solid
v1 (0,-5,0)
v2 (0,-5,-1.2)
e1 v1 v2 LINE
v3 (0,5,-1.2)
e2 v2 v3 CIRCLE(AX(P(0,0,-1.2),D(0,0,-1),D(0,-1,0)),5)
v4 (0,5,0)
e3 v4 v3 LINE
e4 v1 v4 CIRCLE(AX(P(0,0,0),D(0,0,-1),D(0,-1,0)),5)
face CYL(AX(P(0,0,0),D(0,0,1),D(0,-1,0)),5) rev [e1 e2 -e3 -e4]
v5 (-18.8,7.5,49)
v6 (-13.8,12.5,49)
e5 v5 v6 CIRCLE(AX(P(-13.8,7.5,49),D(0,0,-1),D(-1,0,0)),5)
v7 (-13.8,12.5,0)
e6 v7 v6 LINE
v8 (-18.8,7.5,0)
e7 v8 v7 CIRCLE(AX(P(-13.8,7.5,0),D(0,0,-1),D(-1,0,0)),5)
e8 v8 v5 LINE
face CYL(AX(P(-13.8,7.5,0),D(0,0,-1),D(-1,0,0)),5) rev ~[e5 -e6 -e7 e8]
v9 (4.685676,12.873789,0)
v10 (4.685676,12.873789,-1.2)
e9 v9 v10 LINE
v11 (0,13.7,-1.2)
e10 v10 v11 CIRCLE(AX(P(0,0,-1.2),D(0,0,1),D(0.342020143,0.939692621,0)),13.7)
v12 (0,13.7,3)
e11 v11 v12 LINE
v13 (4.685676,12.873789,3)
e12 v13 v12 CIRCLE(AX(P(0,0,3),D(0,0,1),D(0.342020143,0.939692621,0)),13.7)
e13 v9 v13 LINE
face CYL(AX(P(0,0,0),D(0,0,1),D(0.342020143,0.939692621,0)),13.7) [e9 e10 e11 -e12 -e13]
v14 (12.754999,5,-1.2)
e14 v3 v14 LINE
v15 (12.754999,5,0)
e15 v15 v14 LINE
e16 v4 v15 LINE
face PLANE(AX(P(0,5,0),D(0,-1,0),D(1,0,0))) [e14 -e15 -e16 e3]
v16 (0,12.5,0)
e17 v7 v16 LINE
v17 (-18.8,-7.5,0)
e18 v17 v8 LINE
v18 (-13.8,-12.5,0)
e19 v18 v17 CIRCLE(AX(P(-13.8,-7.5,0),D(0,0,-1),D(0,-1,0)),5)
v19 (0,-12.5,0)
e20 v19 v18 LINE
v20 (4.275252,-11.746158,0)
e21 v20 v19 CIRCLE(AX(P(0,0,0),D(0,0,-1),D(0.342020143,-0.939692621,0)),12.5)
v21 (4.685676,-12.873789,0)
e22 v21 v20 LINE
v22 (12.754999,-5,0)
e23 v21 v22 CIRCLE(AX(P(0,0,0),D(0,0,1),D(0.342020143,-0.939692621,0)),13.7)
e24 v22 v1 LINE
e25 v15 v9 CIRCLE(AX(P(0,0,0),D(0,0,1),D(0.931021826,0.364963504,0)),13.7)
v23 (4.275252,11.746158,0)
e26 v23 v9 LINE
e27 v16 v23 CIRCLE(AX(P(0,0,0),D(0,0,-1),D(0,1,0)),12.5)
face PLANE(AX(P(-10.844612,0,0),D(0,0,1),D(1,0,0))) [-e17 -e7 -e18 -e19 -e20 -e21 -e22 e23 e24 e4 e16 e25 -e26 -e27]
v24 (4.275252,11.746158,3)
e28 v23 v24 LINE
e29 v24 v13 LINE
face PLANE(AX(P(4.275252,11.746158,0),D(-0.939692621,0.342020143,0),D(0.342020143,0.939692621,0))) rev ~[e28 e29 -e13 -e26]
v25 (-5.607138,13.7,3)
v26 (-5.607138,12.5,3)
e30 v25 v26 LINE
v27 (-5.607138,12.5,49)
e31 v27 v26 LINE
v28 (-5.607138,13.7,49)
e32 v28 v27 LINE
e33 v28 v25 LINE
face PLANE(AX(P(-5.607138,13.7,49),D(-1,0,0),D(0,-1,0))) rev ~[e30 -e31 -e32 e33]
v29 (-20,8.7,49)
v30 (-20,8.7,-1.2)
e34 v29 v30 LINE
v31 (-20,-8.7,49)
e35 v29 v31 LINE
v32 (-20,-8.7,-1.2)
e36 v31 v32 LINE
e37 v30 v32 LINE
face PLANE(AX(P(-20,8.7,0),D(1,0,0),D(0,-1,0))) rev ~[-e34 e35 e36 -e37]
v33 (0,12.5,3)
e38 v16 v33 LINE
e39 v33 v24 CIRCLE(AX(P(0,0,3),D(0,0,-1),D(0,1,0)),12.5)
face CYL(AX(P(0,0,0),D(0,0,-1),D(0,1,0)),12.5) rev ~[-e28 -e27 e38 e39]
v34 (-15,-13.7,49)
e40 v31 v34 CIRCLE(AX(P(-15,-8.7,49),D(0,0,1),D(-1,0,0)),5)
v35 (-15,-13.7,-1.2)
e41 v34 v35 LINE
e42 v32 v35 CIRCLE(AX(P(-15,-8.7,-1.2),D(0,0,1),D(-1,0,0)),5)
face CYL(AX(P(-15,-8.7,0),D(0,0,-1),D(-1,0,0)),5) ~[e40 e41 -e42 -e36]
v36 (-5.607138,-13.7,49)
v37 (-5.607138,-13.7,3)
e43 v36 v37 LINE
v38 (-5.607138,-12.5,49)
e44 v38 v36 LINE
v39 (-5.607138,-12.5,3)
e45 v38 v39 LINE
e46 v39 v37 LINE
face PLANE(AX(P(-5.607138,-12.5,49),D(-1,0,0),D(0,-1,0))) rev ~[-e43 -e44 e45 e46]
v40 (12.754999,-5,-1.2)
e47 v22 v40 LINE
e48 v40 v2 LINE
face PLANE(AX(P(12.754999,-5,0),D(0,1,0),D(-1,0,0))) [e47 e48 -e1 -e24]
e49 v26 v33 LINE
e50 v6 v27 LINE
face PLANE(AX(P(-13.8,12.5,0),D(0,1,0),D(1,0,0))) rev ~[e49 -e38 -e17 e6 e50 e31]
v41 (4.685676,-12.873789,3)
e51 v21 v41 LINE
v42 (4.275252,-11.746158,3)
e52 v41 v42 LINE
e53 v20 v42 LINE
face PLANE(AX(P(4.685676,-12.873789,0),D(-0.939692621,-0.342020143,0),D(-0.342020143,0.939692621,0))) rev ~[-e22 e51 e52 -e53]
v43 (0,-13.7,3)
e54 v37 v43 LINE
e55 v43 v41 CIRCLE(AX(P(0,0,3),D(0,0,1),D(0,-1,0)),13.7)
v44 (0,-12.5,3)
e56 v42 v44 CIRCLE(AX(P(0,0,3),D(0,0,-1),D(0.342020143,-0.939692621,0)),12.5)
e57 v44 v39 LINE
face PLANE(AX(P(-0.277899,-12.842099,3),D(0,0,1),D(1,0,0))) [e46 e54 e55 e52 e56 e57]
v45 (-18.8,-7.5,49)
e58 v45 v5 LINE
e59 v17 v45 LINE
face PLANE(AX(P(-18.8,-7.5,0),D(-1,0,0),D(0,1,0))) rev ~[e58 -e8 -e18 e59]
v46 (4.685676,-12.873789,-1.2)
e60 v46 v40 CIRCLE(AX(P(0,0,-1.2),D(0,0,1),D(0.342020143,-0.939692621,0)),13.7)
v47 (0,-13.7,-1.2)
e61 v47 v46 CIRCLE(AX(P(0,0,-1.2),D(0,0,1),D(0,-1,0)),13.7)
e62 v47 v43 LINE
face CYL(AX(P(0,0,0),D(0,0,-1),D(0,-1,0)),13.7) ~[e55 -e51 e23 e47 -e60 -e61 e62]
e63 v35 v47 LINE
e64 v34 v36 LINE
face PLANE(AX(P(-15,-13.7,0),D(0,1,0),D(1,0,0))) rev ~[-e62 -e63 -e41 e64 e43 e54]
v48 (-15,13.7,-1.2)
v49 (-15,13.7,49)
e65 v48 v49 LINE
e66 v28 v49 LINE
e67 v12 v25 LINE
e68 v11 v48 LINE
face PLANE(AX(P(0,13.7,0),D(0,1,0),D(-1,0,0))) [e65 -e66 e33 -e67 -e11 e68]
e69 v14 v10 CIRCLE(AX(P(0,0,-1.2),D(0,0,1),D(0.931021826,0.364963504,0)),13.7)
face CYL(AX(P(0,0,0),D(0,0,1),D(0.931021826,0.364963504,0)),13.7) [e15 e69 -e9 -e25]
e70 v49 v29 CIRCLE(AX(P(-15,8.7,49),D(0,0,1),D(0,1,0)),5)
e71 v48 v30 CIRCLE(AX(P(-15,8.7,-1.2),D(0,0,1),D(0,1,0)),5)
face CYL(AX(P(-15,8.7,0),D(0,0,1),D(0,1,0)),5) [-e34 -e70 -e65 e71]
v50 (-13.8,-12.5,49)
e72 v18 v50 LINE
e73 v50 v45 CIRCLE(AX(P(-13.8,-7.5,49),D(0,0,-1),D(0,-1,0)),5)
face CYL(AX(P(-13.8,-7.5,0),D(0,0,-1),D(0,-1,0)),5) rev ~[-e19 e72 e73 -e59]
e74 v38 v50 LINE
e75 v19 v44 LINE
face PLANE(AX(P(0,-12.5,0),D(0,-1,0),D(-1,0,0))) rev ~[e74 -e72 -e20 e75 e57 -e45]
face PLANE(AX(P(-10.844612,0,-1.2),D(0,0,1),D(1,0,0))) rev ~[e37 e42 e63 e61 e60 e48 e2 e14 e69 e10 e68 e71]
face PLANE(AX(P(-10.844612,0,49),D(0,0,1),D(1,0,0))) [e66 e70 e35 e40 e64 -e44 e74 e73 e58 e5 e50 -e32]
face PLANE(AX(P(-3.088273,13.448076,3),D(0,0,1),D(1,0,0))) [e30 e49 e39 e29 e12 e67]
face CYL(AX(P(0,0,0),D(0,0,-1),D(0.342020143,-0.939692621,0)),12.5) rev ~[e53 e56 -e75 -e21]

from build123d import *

# Parameters (mm, degrees)
F1_DEPTH = 1.2
F2_DEPTH = 49
F4_DEPTH = 46


# Not quite as in the source:
# - a feature names something its author has since deleted; it is built from what else it names


with BuildPart() as f1:
    # F0 (on Top) → F1 (new body)
    with BuildSketch(Plane.XY):
        with BuildLine():
            Line((-15, -13.7), (0, -13.7))
            ThreePointArc((0, -13.7), (2.378980034, -13.4918662163), (4.6856759636, -12.8737889048))
            Line((4.6856759636, -12.8737889048), (4.2752517916, -11.7461577598))
            ThreePointArc((4.2752517916, -11.7461577598), (2.1706022208, -12.3100969127), (0, -12.5))
            Line((0, -12.5), (-13.8, -12.5))
            ThreePointArc((-13.8, -12.5), (-17.3355339059, -11.0355339059), (-18.8, -7.5))
            Line((-18.8, -7.5), (-18.8, 7.5))
            ThreePointArc((-18.8, 7.5), (-17.3355339059, 11.0355339059), (-13.8, 12.5))
            Line((-13.8, 12.5), (0, 12.5))
            ThreePointArc((0, 12.5), (2.1706022208, 12.3100969127), (4.2752517916, 11.7461577598))
            Line((4.2752517916, 11.7461577598), (4.6856759636, 12.8737889048))
            ThreePointArc((4.6856759636, 12.8737889048), (2.378980034, 13.4918662163), (0, 13.7))
            Line((0, 13.7), (-15, 13.7))
            ThreePointArc((-15, 13.7), (-18.5355339059, 12.2355339059), (-20, 8.7))
            Line((-20, 8.7), (-20, -8.7))
            ThreePointArc((-20, -8.7), (-18.5355339059, -12.2355339059), (-15, -13.7))
        make_face()
        with BuildLine():
            Line((4.2752517916, -11.7461577598), (4.6856759636, -12.8737889048))
            ThreePointArc((4.6856759636, -12.8737889048), (9.5678327692, -9.8054360485), (12.75499902, -5))
            Line((12.75499902, -5), (11.4564392374, -5))
            ThreePointArc((11.4564392374, -5), (8.5585738758, -9.1104782099), (4.2752517916, -11.7461577598))
        make_face()
        with BuildLine():
            ThreePointArc((0, -12.5), (2.1706022208, -12.3100969127), (4.2752517916, -11.7461577598))
            ThreePointArc((4.2752517916, -11.7461577598), (8.5585738758, -9.1104782099), (11.4564392374, -5))
            Line((11.4564392374, -5), (0, -5))
            ThreePointArc((0, -5), (-5, 0), (0, 5))
            Line((0, 5), (11.4564392374, 5))
            ThreePointArc((11.4564392374, 5), (8.5585738758, 9.1104782099), (4.2752517916, 11.7461577598))
            ThreePointArc((4.2752517916, 11.7461577598), (2.1706022208, 12.3100969127), (0, 12.5))
            Line((0, 12.5), (-13.8, 12.5))
            ThreePointArc((-13.8, 12.5), (-17.3355339059, 11.0355339059), (-18.8, 7.5))
            Line((-18.8, 7.5), (-18.8, -7.5))
            ThreePointArc((-18.8, -7.5), (-17.3355339059, -11.0355339059), (-13.8, -12.5))
            Line((-13.8, -12.5), (0, -12.5))
        make_face()
        with BuildLine():
            ThreePointArc((4.2752517916, 11.7461577598), (8.5585738758, 9.1104782099), (11.4564392374, 5))
            Line((11.4564392374, 5), (12.75499902, 5))
            ThreePointArc((12.75499902, 5), (9.5678327692, 9.8054360485), (4.6856759636, 12.8737889048))
            Line((4.6856759636, 12.8737889048), (4.2752517916, 11.7461577598))
        make_face()
    extrude(amount=-F1_DEPTH)

    # F0 (on Top) → F2 (join)
    with BuildSketch(Plane.XY):
        with BuildLine():
            Line((-15, -13.7), (0, -13.7))
            ThreePointArc((0, -13.7), (2.378980034, -13.4918662163), (4.6856759636, -12.8737889048))
            Line((4.6856759636, -12.8737889048), (4.2752517916, -11.7461577598))
            ThreePointArc((4.2752517916, -11.7461577598), (2.1706022208, -12.3100969127), (0, -12.5))
            Line((0, -12.5), (-13.8, -12.5))
            ThreePointArc((-13.8, -12.5), (-17.3355339059, -11.0355339059), (-18.8, -7.5))
            Line((-18.8, -7.5), (-18.8, 7.5))
            ThreePointArc((-18.8, 7.5), (-17.3355339059, 11.0355339059), (-13.8, 12.5))
            Line((-13.8, 12.5), (0, 12.5))
            ThreePointArc((0, 12.5), (2.1706022208, 12.3100969127), (4.2752517916, 11.7461577598))
            Line((4.2752517916, 11.7461577598), (4.6856759636, 12.8737889048))
            ThreePointArc((4.6856759636, 12.8737889048), (2.378980034, 13.4918662163), (0, 13.7))
            Line((0, 13.7), (-15, 13.7))
            ThreePointArc((-15, 13.7), (-18.5355339059, 12.2355339059), (-20, 8.7))
            Line((-20, 8.7), (-20, -8.7))
            ThreePointArc((-20, -8.7), (-18.5355339059, -12.2355339059), (-15, -13.7))
        make_face()
    extrude(amount=F2_DEPTH)

    # F3 (on face) → F4 (cut)
    with BuildSketch(Plane.XY.offset(49)):
        with BuildLine():
            ThreePointArc((-5.6071383076, 12.5), (-2.8670542374, 13.3966413701), (0, 13.7))
            Line((0, 13.7), (-5.6071383076, 13.7))
            Line((-5.6071383076, 13.7), (-5.6071383076, 12.5))
        make_face()
        with BuildLine():
            Line((4.2752517916, 11.7461577598), (4.6856759636, 12.8737889048))
            ThreePointArc((4.6856759636, 12.8737889048), (2.378980034, 13.4918662163), (0, 13.7))
            ThreePointArc((0, 13.7), (-2.8670542374, 13.3966413701), (-5.6071383076, 12.5))
            Line((-5.6071383076, 12.5), (0, 12.5))
            ThreePointArc((0, 12.5), (2.1706022208, 12.3100969127), (4.2752517916, 11.7461577598))
        make_face()
        with BuildLine():
            ThreePointArc((0, -13.7), (2.378980034, -13.4918662163), (4.6856759636, -12.8737889048))
            Line((4.6856759636, -12.8737889048), (4.2752517916, -11.7461577598))
            ThreePointArc((4.2752517916, -11.7461577598), (2.1706022208, -12.3100969127), (0, -12.5))
            Line((0, -12.5), (-5.6071383076, -12.5))
            ThreePointArc((-5.6071383076, -12.5), (-2.8670542374, -13.3966413701), (0, -13.7))
        make_face()
        with BuildLine():
            Line((-5.6071383076, -13.7), (0, -13.7))
            ThreePointArc((0, -13.7), (-2.8670542374, -13.3966413701), (-5.6071383076, -12.5))
            Line((-5.6071383076, -12.5), (-5.6071383076, -13.7))
        make_face()
    extrude(amount=-F4_DEPTH, mode=Mode.SUBTRACT)


solid = f1.part
